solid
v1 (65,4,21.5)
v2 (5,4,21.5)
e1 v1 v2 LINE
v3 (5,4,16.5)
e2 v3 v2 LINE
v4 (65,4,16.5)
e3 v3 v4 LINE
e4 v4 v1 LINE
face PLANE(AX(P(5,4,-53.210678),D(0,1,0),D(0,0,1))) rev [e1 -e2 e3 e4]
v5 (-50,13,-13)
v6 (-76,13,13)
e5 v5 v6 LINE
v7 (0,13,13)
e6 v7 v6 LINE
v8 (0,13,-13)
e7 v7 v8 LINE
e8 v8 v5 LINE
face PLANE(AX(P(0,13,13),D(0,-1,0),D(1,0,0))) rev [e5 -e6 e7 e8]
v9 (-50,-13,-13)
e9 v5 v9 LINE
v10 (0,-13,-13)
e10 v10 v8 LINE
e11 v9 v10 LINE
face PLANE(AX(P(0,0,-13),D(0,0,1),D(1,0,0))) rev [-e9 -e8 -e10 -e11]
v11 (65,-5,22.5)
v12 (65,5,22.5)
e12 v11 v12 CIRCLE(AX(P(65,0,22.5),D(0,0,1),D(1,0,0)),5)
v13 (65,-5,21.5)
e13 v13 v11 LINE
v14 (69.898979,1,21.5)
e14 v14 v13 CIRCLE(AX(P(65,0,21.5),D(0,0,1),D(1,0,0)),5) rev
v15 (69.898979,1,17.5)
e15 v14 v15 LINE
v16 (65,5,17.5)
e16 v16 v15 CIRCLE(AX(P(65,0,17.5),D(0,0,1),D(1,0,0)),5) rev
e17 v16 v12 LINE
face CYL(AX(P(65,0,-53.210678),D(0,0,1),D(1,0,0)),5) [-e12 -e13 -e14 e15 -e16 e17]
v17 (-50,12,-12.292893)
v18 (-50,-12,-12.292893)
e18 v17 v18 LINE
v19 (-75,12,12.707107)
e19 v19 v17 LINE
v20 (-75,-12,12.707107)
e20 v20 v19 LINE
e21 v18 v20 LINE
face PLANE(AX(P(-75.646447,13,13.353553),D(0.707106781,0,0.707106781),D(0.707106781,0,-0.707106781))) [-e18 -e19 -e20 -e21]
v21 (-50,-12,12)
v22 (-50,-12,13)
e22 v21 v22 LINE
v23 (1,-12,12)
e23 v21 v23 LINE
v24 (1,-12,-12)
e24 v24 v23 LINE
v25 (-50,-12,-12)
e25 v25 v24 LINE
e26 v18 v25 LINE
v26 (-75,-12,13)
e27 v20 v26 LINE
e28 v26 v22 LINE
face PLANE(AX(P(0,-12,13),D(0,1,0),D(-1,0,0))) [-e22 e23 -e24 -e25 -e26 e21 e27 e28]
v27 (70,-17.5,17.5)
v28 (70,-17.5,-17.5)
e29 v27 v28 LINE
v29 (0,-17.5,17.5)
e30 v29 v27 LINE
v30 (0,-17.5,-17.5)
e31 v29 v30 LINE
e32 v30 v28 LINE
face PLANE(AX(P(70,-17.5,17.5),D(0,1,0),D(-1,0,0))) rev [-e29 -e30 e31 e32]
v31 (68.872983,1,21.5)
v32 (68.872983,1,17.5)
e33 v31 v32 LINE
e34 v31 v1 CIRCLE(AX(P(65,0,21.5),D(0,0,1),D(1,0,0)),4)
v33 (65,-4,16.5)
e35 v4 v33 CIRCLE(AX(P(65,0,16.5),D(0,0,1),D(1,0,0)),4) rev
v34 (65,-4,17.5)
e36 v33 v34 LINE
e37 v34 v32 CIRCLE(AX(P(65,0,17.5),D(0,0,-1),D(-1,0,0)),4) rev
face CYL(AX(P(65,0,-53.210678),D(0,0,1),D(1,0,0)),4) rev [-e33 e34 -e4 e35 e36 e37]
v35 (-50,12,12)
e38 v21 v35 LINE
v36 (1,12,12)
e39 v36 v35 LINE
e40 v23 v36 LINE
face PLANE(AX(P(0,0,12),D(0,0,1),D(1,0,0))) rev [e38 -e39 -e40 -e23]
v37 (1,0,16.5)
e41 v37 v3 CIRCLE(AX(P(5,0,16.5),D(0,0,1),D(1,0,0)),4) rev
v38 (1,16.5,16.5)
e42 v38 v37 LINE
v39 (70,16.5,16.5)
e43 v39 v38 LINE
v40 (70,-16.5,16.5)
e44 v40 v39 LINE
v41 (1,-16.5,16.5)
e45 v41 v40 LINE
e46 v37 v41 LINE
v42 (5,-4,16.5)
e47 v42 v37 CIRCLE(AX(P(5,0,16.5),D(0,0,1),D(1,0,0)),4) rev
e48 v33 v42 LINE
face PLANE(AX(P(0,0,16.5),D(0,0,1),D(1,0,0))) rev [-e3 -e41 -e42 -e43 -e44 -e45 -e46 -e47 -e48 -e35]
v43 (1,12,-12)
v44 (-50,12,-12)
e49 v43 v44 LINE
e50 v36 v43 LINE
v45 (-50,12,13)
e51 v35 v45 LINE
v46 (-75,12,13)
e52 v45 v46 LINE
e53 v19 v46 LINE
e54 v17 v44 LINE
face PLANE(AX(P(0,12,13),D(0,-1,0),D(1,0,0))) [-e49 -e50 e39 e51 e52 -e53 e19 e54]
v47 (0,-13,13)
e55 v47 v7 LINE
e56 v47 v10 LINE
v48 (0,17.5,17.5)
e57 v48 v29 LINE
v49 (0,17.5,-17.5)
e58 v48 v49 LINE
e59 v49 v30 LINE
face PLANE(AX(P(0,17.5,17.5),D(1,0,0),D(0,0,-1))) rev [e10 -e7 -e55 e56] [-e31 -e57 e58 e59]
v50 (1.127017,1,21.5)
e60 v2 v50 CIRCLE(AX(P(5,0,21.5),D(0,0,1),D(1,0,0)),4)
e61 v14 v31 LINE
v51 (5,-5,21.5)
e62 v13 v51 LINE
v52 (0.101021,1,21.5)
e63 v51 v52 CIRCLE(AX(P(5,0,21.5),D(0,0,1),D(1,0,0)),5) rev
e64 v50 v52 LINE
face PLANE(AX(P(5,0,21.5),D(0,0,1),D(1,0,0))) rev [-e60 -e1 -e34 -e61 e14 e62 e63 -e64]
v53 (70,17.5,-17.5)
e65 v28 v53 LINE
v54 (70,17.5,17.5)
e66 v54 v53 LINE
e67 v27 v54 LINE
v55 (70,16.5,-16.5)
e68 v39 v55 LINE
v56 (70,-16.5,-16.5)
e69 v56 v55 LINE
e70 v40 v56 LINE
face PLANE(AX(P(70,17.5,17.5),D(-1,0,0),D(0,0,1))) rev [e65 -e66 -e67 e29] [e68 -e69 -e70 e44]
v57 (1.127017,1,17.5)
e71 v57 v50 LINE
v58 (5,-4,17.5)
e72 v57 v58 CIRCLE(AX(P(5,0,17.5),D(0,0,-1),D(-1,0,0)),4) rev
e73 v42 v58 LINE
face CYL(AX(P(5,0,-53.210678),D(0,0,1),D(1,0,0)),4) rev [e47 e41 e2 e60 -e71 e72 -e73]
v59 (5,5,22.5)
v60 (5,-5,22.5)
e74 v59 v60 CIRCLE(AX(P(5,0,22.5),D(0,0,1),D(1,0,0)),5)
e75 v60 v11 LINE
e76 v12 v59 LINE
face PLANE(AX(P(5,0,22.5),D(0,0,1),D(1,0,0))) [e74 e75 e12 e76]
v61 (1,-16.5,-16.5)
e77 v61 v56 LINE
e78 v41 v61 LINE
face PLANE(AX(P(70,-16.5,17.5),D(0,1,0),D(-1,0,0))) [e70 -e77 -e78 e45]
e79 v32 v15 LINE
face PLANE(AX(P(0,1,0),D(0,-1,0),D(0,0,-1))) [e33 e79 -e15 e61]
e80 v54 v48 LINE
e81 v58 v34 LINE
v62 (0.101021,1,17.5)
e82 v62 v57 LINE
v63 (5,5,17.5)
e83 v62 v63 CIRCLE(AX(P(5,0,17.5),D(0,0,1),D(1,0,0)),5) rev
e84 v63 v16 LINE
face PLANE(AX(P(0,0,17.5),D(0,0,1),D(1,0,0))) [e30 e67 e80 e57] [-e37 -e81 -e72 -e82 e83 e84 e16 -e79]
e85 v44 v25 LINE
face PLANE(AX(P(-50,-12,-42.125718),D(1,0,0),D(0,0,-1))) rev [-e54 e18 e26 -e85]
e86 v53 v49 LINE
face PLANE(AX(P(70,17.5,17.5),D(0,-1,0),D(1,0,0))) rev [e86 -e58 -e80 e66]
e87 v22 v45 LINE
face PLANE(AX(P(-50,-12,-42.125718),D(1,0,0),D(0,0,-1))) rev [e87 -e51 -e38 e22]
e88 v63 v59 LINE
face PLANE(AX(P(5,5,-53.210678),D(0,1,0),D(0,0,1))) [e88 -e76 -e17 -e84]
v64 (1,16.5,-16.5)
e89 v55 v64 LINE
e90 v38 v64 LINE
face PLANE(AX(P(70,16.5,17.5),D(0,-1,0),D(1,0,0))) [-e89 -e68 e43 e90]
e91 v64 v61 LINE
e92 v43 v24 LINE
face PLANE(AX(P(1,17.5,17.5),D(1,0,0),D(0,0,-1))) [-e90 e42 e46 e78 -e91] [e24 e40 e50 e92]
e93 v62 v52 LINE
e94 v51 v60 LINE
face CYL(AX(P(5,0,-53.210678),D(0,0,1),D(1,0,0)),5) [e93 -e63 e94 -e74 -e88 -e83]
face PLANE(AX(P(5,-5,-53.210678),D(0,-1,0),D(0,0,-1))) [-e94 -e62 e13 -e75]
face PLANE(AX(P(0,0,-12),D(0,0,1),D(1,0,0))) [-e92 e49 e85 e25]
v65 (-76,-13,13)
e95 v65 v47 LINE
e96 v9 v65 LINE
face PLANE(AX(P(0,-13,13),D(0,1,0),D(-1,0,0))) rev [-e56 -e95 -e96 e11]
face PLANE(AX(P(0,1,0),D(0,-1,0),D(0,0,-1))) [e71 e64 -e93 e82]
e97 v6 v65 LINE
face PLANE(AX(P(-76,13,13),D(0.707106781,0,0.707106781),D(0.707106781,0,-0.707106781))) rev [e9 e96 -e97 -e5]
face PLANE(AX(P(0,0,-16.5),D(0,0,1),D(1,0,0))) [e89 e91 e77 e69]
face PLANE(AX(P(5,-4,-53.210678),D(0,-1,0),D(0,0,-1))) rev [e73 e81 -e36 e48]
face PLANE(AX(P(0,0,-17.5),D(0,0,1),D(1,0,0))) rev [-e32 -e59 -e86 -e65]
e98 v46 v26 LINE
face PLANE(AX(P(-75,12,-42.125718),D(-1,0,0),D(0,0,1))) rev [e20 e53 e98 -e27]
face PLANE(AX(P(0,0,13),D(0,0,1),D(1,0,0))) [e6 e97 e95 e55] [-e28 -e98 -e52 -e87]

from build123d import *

# Parameters (mm, degrees)
SKETCH_4_W           = 70
SKETCH_4_H           = 35
EXTRUDE_6_DEPTH      = 17.5
EXTRUDE_7_DEPTH      = 5
SHELL_START          = -16.5
SHELL_3_OUTLINE_W    = 69
SHELL_3_OUTLINE_H    = 33
SHELL_3_DEPTH        = 33
SHELL_START_2        = 16.5
SHELL_3_2_DEPTH      = 5
SKETCH_9_W           = 70
SKETCH_9_H           = 4
CUT_EXTRUDE_1_DEPTH  = 6
SKETCH_22_W          = 50
SKETCH_22_H          = 26
EXTRUDE_8_DEPTH      = 13
SHELL_START_3        = -50
SHELL_4_OUTLINE_W    = 24
SHELL_4_OUTLINE_H    = 24
SHELL_4_DEPTH        = 50
SKETCH_23_W          = 24
SKETCH_23_H          = 24
CUT_EXTRUDE_3_DEPTH  = 1
EXTRUDE_11_DEPTH     = 13
SHELL_START_4        = -12
SHELL_13_DEPTH       = 24
CUT_EXTRUDE_16_REACH = 85.741
SKETCH_40_W          = 25
SKETCH_40_H          = 24


# Read off the part's stored shape, not the designer's step: 抽壳3, 抽壳4, 抽壳13
with BuildPart() as part:
    # 草图4 → 凸台-拉伸6 (new, symmetric)
    with BuildSketch(Plane.XY):
        with Locations((35, 0)):
            Rectangle(SKETCH_4_W, SKETCH_4_H)
    extrude(amount=EXTRUDE_6_DEPTH, both=True)

    # 草图6 → 凸台-拉伸7 (add)
    with BuildSketch(Plane.XY.offset(22.5)):
        with BuildLine():
            Line((5, 5), (65, 5))
            ThreePointArc((65, 5), (70, 0), (65, -5))
            Line((65, -5), (5, -5))
            ThreePointArc((5, -5), (0, 0), (5, 5))
        make_face()
    extrude(amount=-EXTRUDE_7_DEPTH)

    # 抽壳3 outline → 抽壳3 (cut)
    with BuildSketch(Plane.XY.offset(SHELL_START)):
        with Locations((35.5, 0)):
            Rectangle(SHELL_3_OUTLINE_W, SHELL_3_OUTLINE_H)
    extrude(amount=SHELL_3_DEPTH, mode=Mode.SUBTRACT)

    # Shell 3 2 outline → Shell 3 2 (cut)
    with BuildSketch(Plane.XY.offset(SHELL_START_2)):
        with BuildLine():
            ThreePointArc((5, 4), (1, 0), (5, -4))
            Line((5, -4), (65, -4))
            ThreePointArc((65, -4), (69, 0), (65, 4))
            Line((65, 4), (5, 4))
        make_face()
    extrude(amount=SHELL_3_2_DEPTH, mode=Mode.SUBTRACT)

    # 草图9 → 切除-拉伸1 (cut)
    with BuildSketch(Plane.XZ.offset(5)):
        with Locations((35, 19.5)):
            Rectangle(SKETCH_9_W, SKETCH_9_H)
    extrude(amount=-CUT_EXTRUDE_1_DEPTH, mode=Mode.SUBTRACT)

    # 草图22 → 凸台-拉伸8 (add, symmetric)
    with BuildSketch(Plane.XY):
        with Locations((-25, 0)):
            Rectangle(SKETCH_22_W, SKETCH_22_H)
    extrude(amount=EXTRUDE_8_DEPTH, both=True)

    # 抽壳4 outline → 抽壳4 (cut)
    with BuildSketch(Plane.YZ.offset(SHELL_START_3)):
        Rectangle(SHELL_4_OUTLINE_W, SHELL_4_OUTLINE_H)
    extrude(amount=SHELL_4_DEPTH, mode=Mode.SUBTRACT)

    # 草图23 → 切除-拉伸3 (cut)
    with BuildSketch(Plane.ZY):
        Rectangle(SKETCH_23_W, SKETCH_23_H)
    extrude(amount=-CUT_EXTRUDE_3_DEPTH, mode=Mode.SUBTRACT)

    # 草图28 → 凸台-拉伸11 (add, symmetric)
    with BuildSketch(Plane(origin=(0, 0, 0), x_dir=(1, 0, 0), z_dir=(0, 1, 0))):
        Polygon((-50, 13), (-50, -13), (-76, -13), align=None)
    extrude(amount=EXTRUDE_11_DEPTH, both=True)

    # 抽壳13 outline → 抽壳13 (cut)
    with BuildSketch(Plane(origin=(0, 0, 0), x_dir=(1, 0, 0), z_dir=(0, 1, 0)).offset(SHELL_START_4)):
        Polygon((-50, 11.585786438), (-73.585786438, -12), (-50, -12), align=None)
    extrude(amount=SHELL_13_DEPTH, mode=Mode.SUBTRACT)

    # 切除-拉伸16: up to this plane
    cut_extrude_16_end = Plane(origin=(-75.646446609, 13, 13.353553391), z_dir=(0.7071067811865512, 0, 0.7071067811865439))
    # 草图40 → 切除-拉伸16 (cut, up to the surface)
    with BuildSketch(Plane.XY.offset(13), mode=Mode.PRIVATE) as cut_extrude_16_sk1:
        with Locations((-62.5, 0)):
            Rectangle(SKETCH_40_W, SKETCH_40_H)
    cut_extrude_16_tool1 = split(extrude(cut_extrude_16_sk1.sketch, amount=-CUT_EXTRUDE_16_REACH, mode=Mode.PRIVATE), bisect_by=cut_extrude_16_end, keep=Keep.BOTH, mode=Mode.PRIVATE)
    add(cut_extrude_16_tool1.solids().sort_by_distance((-62.5, 0, 13))[0], mode=Mode.SUBTRACT)


solid = part.part
